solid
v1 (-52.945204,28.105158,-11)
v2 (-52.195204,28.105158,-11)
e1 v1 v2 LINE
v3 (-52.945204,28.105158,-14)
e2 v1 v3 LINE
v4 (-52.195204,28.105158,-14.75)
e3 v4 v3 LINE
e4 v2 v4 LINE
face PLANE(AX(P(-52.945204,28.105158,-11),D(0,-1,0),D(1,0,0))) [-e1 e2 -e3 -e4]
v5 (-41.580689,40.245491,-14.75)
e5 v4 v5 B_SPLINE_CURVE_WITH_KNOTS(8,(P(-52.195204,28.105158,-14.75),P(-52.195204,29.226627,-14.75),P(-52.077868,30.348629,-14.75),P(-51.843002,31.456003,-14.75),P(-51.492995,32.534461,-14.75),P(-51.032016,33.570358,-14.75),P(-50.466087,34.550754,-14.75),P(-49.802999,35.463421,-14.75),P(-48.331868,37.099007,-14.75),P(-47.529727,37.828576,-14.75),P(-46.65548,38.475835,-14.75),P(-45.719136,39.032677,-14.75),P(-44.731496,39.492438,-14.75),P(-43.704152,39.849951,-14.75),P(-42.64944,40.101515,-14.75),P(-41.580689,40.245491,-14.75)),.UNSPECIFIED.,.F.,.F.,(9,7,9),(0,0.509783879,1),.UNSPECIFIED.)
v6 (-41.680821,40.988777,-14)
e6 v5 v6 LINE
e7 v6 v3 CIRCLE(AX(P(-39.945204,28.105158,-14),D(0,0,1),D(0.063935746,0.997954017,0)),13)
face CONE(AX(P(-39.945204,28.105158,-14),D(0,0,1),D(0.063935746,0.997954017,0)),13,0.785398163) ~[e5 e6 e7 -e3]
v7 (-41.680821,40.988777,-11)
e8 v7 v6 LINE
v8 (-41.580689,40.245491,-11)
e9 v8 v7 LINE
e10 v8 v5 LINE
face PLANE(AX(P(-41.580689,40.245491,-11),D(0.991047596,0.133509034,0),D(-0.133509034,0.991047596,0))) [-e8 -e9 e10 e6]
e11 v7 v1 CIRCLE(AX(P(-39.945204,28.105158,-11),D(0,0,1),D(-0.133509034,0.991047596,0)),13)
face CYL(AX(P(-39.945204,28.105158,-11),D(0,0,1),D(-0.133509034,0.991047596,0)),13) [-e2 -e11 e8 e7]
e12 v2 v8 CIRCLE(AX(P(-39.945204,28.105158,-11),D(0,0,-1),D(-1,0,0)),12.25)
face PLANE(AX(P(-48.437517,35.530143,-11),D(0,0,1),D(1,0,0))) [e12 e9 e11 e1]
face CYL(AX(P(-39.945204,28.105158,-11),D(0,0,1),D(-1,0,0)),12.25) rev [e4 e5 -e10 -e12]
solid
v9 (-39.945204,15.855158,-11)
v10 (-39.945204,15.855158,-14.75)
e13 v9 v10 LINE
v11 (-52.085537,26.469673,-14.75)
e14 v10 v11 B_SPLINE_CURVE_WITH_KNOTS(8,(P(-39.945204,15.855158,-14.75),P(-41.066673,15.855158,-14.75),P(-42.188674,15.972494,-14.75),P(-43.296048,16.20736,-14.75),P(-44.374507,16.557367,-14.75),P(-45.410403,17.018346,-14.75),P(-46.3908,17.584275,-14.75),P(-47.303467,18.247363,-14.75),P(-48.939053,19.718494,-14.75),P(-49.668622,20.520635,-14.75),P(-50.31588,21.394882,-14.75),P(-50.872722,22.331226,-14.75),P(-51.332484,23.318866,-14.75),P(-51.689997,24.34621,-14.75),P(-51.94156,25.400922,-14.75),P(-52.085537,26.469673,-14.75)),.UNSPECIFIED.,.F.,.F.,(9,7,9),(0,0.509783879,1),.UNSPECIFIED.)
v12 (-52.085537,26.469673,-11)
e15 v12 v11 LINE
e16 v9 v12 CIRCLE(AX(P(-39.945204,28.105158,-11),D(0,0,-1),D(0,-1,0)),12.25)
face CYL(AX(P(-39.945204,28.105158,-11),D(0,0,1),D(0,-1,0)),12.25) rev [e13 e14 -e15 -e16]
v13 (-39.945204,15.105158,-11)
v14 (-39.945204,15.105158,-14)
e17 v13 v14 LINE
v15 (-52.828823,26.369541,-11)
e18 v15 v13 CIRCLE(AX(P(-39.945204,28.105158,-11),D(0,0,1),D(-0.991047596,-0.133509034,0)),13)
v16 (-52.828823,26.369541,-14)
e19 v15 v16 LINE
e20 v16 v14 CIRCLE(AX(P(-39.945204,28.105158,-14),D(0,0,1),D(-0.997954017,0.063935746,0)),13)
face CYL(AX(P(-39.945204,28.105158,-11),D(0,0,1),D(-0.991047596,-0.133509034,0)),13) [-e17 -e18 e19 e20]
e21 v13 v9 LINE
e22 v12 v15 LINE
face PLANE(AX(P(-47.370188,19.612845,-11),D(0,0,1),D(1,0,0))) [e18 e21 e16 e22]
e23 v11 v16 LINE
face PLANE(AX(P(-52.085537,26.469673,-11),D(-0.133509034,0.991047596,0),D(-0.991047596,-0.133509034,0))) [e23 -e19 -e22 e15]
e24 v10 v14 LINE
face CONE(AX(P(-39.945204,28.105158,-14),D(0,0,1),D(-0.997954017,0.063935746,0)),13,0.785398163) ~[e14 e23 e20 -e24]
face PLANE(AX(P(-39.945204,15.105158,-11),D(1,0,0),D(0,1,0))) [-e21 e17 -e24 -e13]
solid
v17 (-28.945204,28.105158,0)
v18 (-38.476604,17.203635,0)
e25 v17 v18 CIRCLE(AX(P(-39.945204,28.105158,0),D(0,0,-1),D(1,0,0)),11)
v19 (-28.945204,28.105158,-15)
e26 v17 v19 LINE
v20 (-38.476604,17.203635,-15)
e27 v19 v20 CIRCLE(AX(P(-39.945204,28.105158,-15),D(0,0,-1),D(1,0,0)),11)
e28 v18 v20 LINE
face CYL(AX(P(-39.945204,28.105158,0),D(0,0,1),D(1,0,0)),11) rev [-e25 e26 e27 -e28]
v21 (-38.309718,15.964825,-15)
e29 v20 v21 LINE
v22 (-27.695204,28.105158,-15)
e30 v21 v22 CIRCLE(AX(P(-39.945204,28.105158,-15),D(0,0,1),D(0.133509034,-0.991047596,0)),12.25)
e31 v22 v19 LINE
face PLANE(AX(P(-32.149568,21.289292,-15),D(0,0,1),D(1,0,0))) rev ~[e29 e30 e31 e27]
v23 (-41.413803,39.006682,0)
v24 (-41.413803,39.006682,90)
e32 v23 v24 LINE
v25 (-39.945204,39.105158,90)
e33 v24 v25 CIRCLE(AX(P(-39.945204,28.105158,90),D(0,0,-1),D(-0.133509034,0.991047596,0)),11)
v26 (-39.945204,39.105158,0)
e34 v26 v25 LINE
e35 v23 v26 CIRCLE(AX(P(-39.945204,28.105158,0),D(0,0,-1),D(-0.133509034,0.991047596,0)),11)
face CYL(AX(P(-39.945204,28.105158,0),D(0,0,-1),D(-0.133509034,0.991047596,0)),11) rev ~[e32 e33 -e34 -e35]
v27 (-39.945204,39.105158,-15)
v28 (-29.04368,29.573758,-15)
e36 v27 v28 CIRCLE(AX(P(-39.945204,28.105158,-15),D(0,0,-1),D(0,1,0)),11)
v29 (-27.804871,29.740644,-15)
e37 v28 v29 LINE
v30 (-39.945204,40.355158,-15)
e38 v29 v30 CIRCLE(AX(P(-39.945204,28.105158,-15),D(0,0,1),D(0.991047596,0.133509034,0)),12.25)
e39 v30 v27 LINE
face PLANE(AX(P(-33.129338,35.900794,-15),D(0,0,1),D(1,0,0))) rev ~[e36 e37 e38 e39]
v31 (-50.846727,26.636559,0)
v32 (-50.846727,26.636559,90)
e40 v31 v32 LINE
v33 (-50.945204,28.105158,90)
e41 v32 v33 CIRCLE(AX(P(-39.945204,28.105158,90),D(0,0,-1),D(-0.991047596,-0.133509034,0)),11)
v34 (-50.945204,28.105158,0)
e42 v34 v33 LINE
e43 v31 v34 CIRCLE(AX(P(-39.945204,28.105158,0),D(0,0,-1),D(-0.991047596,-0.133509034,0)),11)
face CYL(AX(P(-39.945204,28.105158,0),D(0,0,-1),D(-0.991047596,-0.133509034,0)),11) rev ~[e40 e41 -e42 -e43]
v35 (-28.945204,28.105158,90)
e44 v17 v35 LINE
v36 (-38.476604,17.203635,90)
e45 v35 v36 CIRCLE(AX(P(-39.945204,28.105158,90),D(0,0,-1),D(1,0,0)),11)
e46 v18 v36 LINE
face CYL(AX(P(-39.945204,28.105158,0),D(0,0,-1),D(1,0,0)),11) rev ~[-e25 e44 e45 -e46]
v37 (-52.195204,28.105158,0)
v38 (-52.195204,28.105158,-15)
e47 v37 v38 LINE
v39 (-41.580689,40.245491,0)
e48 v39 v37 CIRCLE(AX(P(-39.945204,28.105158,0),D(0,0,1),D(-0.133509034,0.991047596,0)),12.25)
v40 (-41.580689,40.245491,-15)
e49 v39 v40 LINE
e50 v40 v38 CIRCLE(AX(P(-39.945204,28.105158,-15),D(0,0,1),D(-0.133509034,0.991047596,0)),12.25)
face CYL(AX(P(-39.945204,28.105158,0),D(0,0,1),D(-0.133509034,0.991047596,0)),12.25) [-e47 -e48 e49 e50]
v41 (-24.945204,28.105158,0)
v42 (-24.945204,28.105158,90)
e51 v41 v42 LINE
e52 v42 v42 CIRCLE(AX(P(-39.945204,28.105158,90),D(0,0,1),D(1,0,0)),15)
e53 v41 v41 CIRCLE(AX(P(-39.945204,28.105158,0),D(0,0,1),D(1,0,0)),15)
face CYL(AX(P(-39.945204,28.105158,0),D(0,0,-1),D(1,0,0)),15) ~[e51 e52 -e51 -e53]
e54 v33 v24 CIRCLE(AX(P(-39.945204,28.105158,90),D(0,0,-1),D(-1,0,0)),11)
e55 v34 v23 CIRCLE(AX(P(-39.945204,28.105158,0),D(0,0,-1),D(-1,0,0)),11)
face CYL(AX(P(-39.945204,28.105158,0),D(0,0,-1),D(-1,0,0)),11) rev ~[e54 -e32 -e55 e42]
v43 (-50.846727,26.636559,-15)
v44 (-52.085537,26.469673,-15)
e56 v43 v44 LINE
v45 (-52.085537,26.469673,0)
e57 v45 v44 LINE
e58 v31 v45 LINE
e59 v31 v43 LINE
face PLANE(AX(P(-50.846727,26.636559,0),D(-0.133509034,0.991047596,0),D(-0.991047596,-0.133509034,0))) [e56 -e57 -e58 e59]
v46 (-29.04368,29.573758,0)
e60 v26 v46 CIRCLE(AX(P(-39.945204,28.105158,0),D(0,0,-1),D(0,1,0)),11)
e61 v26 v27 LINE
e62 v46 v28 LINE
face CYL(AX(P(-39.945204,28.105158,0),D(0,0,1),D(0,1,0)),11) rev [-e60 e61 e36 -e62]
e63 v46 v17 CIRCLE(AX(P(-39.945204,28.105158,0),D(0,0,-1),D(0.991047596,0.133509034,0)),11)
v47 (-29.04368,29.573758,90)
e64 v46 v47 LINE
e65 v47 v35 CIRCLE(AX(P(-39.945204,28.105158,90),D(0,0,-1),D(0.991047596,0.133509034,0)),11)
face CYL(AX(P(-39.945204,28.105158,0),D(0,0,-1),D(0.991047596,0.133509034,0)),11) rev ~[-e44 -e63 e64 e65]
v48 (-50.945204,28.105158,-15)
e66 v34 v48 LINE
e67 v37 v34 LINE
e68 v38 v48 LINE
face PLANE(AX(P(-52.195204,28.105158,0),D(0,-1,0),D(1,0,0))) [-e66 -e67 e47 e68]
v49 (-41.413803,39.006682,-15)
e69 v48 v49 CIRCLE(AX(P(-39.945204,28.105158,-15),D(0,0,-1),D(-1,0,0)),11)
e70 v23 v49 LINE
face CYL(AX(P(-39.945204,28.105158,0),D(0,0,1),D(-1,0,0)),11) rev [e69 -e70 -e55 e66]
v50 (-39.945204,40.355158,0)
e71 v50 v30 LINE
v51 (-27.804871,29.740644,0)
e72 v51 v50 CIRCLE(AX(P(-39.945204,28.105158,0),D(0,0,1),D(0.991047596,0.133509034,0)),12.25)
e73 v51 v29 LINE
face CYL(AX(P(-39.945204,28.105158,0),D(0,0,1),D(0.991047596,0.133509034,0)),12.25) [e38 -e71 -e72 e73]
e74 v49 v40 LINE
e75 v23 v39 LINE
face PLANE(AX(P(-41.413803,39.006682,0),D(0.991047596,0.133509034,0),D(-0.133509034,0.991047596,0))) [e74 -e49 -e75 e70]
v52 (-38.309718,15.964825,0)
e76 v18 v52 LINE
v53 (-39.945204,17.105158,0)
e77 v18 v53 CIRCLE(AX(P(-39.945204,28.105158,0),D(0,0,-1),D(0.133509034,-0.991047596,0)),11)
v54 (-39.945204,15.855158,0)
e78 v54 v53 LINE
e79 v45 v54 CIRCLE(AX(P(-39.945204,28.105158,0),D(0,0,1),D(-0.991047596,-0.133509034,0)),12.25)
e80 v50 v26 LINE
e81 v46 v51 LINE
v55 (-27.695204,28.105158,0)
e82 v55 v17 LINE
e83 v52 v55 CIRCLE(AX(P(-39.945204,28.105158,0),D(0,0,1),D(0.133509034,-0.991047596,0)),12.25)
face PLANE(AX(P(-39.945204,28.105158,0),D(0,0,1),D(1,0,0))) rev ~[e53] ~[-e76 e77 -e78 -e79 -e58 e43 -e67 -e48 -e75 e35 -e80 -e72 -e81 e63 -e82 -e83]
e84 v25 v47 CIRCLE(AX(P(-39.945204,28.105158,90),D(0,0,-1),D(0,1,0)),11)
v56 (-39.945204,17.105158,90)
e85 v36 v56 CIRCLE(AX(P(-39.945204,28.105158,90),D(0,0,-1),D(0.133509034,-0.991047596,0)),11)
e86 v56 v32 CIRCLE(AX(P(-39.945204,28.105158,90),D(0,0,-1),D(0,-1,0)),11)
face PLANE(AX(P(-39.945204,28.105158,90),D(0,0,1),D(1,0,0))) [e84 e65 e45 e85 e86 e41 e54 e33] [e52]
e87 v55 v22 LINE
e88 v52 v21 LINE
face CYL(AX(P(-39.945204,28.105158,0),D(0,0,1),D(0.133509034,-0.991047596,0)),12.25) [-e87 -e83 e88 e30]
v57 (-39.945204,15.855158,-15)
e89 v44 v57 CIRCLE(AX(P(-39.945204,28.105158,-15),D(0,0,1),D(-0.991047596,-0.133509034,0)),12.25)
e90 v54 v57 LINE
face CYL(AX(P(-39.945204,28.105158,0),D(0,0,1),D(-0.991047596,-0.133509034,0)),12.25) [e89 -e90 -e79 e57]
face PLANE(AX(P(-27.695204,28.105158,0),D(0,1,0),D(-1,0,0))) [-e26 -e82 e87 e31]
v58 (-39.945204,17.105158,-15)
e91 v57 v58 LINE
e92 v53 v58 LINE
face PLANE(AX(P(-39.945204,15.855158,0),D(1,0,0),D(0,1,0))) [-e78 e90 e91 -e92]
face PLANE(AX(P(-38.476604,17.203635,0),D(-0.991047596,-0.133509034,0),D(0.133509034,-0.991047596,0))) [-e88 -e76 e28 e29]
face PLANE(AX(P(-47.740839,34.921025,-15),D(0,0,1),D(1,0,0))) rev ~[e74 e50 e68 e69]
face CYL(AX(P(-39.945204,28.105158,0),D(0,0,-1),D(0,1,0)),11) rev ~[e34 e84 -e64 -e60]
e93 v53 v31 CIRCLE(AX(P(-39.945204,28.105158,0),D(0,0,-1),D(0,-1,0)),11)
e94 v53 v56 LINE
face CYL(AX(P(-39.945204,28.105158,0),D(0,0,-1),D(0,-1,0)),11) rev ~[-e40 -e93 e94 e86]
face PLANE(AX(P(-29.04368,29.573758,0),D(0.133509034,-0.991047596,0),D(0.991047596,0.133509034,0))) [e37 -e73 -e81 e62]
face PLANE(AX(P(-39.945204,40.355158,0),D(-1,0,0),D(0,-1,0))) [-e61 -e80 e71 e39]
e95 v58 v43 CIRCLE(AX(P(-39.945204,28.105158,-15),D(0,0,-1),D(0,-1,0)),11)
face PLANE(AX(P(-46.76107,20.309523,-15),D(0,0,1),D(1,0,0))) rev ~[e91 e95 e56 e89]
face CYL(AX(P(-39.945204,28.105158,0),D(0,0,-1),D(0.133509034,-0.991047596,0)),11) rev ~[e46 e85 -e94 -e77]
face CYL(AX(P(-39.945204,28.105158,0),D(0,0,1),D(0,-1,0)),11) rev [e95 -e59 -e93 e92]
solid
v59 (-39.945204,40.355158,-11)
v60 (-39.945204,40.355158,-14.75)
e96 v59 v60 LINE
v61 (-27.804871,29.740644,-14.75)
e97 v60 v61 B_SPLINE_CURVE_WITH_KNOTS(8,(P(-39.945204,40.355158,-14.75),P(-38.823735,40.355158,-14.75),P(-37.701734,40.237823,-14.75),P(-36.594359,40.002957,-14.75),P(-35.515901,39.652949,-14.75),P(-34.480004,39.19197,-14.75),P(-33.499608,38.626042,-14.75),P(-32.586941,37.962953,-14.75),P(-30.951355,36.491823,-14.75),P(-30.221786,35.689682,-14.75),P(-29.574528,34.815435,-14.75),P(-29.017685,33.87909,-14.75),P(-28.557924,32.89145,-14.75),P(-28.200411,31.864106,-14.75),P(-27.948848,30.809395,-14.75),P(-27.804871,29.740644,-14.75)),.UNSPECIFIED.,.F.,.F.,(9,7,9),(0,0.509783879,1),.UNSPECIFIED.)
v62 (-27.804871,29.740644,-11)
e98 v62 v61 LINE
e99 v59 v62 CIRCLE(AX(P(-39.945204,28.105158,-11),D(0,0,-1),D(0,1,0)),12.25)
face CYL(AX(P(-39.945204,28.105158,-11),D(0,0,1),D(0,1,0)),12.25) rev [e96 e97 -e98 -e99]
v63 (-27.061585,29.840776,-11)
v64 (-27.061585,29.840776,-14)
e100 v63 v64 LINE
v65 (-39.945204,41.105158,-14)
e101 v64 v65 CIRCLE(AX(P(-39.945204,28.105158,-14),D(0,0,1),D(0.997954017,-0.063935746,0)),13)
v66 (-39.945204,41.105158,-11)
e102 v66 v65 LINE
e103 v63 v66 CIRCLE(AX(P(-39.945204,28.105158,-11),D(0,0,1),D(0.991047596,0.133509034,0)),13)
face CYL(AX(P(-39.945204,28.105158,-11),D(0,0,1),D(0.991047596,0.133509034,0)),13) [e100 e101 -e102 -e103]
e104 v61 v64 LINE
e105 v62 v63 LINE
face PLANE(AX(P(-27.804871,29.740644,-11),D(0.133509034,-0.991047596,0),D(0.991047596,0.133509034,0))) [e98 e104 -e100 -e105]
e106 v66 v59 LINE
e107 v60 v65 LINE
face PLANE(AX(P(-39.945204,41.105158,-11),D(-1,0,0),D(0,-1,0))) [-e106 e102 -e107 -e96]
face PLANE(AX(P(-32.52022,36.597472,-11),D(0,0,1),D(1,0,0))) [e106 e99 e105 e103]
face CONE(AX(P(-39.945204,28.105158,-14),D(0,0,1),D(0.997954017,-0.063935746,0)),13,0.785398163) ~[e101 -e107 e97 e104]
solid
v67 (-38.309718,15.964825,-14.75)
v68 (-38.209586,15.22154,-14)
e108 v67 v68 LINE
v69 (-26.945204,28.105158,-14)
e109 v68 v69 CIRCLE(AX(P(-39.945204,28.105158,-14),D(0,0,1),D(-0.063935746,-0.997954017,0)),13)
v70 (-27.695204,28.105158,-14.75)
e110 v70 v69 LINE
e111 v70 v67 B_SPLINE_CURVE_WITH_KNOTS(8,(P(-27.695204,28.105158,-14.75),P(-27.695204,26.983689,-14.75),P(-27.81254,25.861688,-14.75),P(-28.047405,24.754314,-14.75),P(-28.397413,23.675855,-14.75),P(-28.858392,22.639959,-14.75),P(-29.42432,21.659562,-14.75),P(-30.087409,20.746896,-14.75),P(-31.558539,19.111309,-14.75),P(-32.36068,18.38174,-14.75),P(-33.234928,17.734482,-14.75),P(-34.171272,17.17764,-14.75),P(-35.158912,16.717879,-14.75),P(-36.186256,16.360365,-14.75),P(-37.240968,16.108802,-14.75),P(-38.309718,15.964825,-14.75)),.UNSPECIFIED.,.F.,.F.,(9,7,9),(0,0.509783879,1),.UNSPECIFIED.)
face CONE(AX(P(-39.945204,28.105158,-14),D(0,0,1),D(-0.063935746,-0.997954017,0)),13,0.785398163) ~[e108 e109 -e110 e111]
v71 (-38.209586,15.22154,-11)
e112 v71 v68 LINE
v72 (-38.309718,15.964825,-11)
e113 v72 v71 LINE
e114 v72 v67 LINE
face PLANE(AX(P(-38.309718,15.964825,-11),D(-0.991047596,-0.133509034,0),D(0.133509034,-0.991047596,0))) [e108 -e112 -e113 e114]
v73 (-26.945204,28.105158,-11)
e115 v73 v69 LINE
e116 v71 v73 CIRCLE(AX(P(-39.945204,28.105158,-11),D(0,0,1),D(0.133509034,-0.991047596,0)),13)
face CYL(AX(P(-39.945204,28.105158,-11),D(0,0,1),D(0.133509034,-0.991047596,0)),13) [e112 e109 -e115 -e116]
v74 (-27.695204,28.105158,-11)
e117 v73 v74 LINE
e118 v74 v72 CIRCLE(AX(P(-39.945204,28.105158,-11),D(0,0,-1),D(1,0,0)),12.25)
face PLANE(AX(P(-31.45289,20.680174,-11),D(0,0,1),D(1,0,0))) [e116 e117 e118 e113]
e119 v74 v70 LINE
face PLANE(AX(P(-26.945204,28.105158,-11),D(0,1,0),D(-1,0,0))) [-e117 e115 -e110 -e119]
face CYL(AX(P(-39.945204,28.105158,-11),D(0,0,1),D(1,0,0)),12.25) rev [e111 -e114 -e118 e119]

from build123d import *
from build123d import SkipClean  # not in build123d's __all__

# Parameters (mm, degrees)
F0_R          = 15
F1_DEPTH      = 90
F2_DEPTH      = 15
F3_START      = -11
F3_DEPTH      = 4
F4_T2_ANGLE   = 105.003910896
F4_2_T2_ANGLE = 105.003910896
F4_3_T2_ANGLE = 105.003910896
F4_4_T2_ANGLE = 105.003910896


# Not quite as in the source:
# - a fillet or chamfer that OpenCascade refuses, or shapes differently, is made with other operations: its cross-section is extruded or revolved along the edge and cut away or added


with BuildPart() as f1:
    # F0 (on Top) → F1 (new body)
    with BuildSketch(Plane.XY):
        with Locations((-39.9452038109, 28.1051583588)):
            Circle(F0_R)
        with BuildLine():
            ThreePointArc((-27.061585061, 29.8407758013), (-26.9743317556, 28.9749158684), (-26.9452038109, 28.1051583588))
            ThreePointArc((-26.9452038109, 28.1051583588), (-30.1584007897, 19.5483782036), (-38.2095863684, 15.2215396089))
            ThreePointArc((-38.2095863684, 15.2215396089), (-39.0754463013, 15.1342863035), (-39.9452038109, 15.1051583588))
            ThreePointArc((-39.9452038109, 15.1051583588), (-48.5019839661, 18.3183553376), (-52.8288225609, 26.3695409163))
            ThreePointArc((-52.8288225609, 26.3695409163), (-52.9160758662, 27.2354008492), (-52.9452038109, 28.1051583588))
            ThreePointArc((-52.9452038109, 28.1051583588), (-49.7320068322, 36.661938514), (-41.6808212534, 40.9887771087))
            ThreePointArc((-41.6808212534, 40.9887771087), (-40.8149613205, 41.0760304141), (-39.9452038109, 41.1051583588))
            ThreePointArc((-39.9452038109, 41.1051583588), (-31.3884236558, 37.89196138), (-27.061585061, 29.8407758013))
        make_face(mode=Mode.SUBTRACT)
        with BuildLine():
            ThreePointArc((-52.0855368637, 26.4696726918), (-48.0083235725, 18.8829785888), (-39.9452038109, 15.8551583588))
            Line((-39.9452038109, 15.8551583588), (-39.9452038109, 17.1051583588))
            ThreePointArc((-39.9452038109, 17.1051583588), (-47.1855562499, 19.8240173409), (-50.8467273686, 26.6365589844))
            Line((-50.8467273686, 26.6365589844), (-52.0855368637, 26.4696726918))
        make_face()
        with BuildLine():
            ThreePointArc((-27.8048707581, 29.7406440258), (-27.7226512973, 28.9247375506), (-27.6952038109, 28.1051583588))
            Line((-27.6952038109, 28.1051583588), (-26.9452038109, 28.1051583588))
            ThreePointArc((-26.9452038109, 28.1051583588), (-26.9743317556, 28.9749158684), (-27.061585061, 29.8407758013))
            Line((-27.061585061, 29.8407758013), (-27.8048707581, 29.7406440258))
        make_face()
        with BuildLine():
            ThreePointArc((-39.9452038109, 40.3551583588), (-31.8820840493, 37.3273381288), (-27.8048707581, 29.7406440258))
            Line((-27.8048707581, 29.7406440258), (-27.061585061, 29.8407758013))
            ThreePointArc((-27.061585061, 29.8407758013), (-31.3884236558, 37.89196138), (-39.9452038109, 41.1051583588))
            Line((-39.9452038109, 41.1051583588), (-39.9452038109, 40.3551583588))
        make_face()
        with BuildLine():
            ThreePointArc((-41.5806894779, 40.2454914116), (-40.7647830027, 40.3277108724), (-39.9452038109, 40.3551583588))
            Line((-39.9452038109, 40.3551583588), (-39.9452038109, 41.1051583588))
            ThreePointArc((-39.9452038109, 41.1051583588), (-40.8149613205, 41.0760304141), (-41.6808212534, 40.9887771087))
            Line((-41.6808212534, 40.9887771087), (-41.5806894779, 40.2454914116))
        make_face()
        with BuildLine():
            ThreePointArc((-52.1952038109, 28.1051583588), (-49.1673835809, 36.1682781204), (-41.5806894779, 40.2454914116))
            Line((-41.5806894779, 40.2454914116), (-41.6808212534, 40.9887771087))
            ThreePointArc((-41.6808212534, 40.9887771087), (-49.7320068322, 36.661938514), (-52.9452038109, 28.1051583588))
            Line((-52.9452038109, 28.1051583588), (-52.1952038109, 28.1051583588))
        make_face()
        with BuildLine():
            Line((-52.8288225609, 26.3695409163), (-52.0855368637, 26.4696726918))
            ThreePointArc((-52.0855368637, 26.4696726918), (-52.1677563246, 27.2855791671), (-52.1952038109, 28.1051583588))
            Line((-52.1952038109, 28.1051583588), (-52.9452038109, 28.1051583588))
            ThreePointArc((-52.9452038109, 28.1051583588), (-52.9160758662, 27.2354008492), (-52.8288225609, 26.3695409163))
        make_face()
        with BuildLine():
            Line((-39.9452038109, 15.1051583588), (-39.9452038109, 15.8551583588))
            ThreePointArc((-39.9452038109, 15.8551583588), (-48.0083235725, 18.8829785888), (-52.0855368637, 26.4696726918))
            Line((-52.0855368637, 26.4696726918), (-52.8288225609, 26.3695409163))
            ThreePointArc((-52.8288225609, 26.3695409163), (-48.5019839661, 18.3183553376), (-39.9452038109, 15.1051583588))
        make_face()
        with BuildLine():
            Line((-38.2095863684, 15.2215396089), (-38.309718144, 15.964825306))
            ThreePointArc((-38.309718144, 15.964825306), (-39.1256246192, 15.8826058452), (-39.9452038109, 15.8551583588))
            Line((-39.9452038109, 15.8551583588), (-39.9452038109, 15.1051583588))
            ThreePointArc((-39.9452038109, 15.1051583588), (-39.0754463013, 15.1342863035), (-38.2095863684, 15.2215396089))
        make_face()
        with BuildLine():
            Line((-26.9452038109, 28.1051583588), (-27.6952038109, 28.1051583588))
            ThreePointArc((-27.6952038109, 28.1051583588), (-30.7230240409, 20.0420385972), (-38.309718144, 15.964825306))
            Line((-38.309718144, 15.964825306), (-38.2095863684, 15.2215396089))
            ThreePointArc((-38.2095863684, 15.2215396089), (-30.1584007897, 19.5483782036), (-26.9452038109, 28.1051583588))
        make_face()
        with BuildLine():
            ThreePointArc((-38.309718144, 15.964825306), (-30.7230240409, 20.0420385972), (-27.6952038109, 28.1051583588))
            Line((-27.6952038109, 28.1051583588), (-28.9452038109, 28.1051583588))
            ThreePointArc((-28.9452038109, 28.1051583588), (-31.664062793, 20.8648059198), (-38.4766044365, 17.2036348012))
            Line((-38.4766044365, 17.2036348012), (-38.309718144, 15.964825306))
        make_face()
        with BuildLine():
            Line((-29.0436802533, 29.5737577332), (-27.8048707581, 29.7406440258))
            ThreePointArc((-27.8048707581, 29.7406440258), (-31.8820840493, 37.3273381288), (-39.9452038109, 40.3551583588))
            Line((-39.9452038109, 40.3551583588), (-39.9452038109, 39.1051583588))
            ThreePointArc((-39.9452038109, 39.1051583588), (-32.7048513719, 36.3862993768), (-29.0436802533, 29.5737577332))
        make_face()
        with BuildLine():
            Line((-41.4138031853, 39.0066819164), (-41.5806894779, 40.2454914116))
            ThreePointArc((-41.5806894779, 40.2454914116), (-49.1673835809, 36.1682781204), (-52.1952038109, 28.1051583588))
            Line((-52.1952038109, 28.1051583588), (-50.9452038109, 28.1051583588))
            ThreePointArc((-50.9452038109, 28.1051583588), (-48.2263448289, 35.3455107978), (-41.4138031853, 39.0066819164))
        make_face()
        with BuildLine():
            Line((-39.9452038109, 39.1051583588), (-39.9452038109, 40.3551583588))
            ThreePointArc((-39.9452038109, 40.3551583588), (-40.7647830027, 40.3277108724), (-41.5806894779, 40.2454914116))
            Line((-41.5806894779, 40.2454914116), (-41.4138031853, 39.0066819164))
            ThreePointArc((-41.4138031853, 39.0066819164), (-40.6811524729, 39.0805116364), (-39.9452038109, 39.1051583588))
        make_face()
        with BuildLine():
            Line((-28.9452038109, 28.1051583588), (-27.6952038109, 28.1051583588))
            ThreePointArc((-27.6952038109, 28.1051583588), (-27.7226512973, 28.9247375506), (-27.8048707581, 29.7406440258))
            Line((-27.8048707581, 29.7406440258), (-29.0436802533, 29.5737577332))
            ThreePointArc((-29.0436802533, 29.5737577332), (-28.9698505334, 28.8411070208), (-28.9452038109, 28.1051583588))
        make_face()
        with BuildLine():
            ThreePointArc((-39.9452038109, 15.8551583588), (-39.1256246192, 15.8826058452), (-38.309718144, 15.964825306))
            Line((-38.309718144, 15.964825306), (-38.4766044365, 17.2036348012))
            ThreePointArc((-38.4766044365, 17.2036348012), (-39.209255149, 17.1298050813), (-39.9452038109, 17.1051583588))
            Line((-39.9452038109, 17.1051583588), (-39.9452038109, 15.8551583588))
        make_face()
        with BuildLine():
            ThreePointArc((-52.1952038109, 28.1051583588), (-52.1677563246, 27.2855791671), (-52.0855368637, 26.4696726918))
            Line((-52.0855368637, 26.4696726918), (-50.8467273686, 26.6365589844))
            ThreePointArc((-50.8467273686, 26.6365589844), (-50.9205570885, 27.3692096968), (-50.9452038109, 28.1051583588))
            Line((-50.9452038109, 28.1051583588), (-52.1952038109, 28.1051583588))
        make_face()
    extrude(amount=F1_DEPTH)

    # F0 (on Top) → F2 (join)
    with BuildSketch(Plane.XY):
        with BuildLine():
            Line((-41.4138031853, 39.0066819164), (-41.5806894779, 40.2454914116))
            ThreePointArc((-41.5806894779, 40.2454914116), (-49.1673835809, 36.1682781204), (-52.1952038109, 28.1051583588))
            Line((-52.1952038109, 28.1051583588), (-50.9452038109, 28.1051583588))
            ThreePointArc((-50.9452038109, 28.1051583588), (-48.2263448289, 35.3455107978), (-41.4138031853, 39.0066819164))
        make_face()
        with BuildLine():
            Line((-29.0436802533, 29.5737577332), (-27.8048707581, 29.7406440258))
            ThreePointArc((-27.8048707581, 29.7406440258), (-31.8820840493, 37.3273381288), (-39.9452038109, 40.3551583588))
            Line((-39.9452038109, 40.3551583588), (-39.9452038109, 39.1051583588))
            ThreePointArc((-39.9452038109, 39.1051583588), (-32.7048513719, 36.3862993768), (-29.0436802533, 29.5737577332))
        make_face()
        with BuildLine():
            ThreePointArc((-38.309718144, 15.964825306), (-30.7230240409, 20.0420385972), (-27.6952038109, 28.1051583588))
            Line((-27.6952038109, 28.1051583588), (-28.9452038109, 28.1051583588))
            ThreePointArc((-28.9452038109, 28.1051583588), (-31.664062793, 20.8648059198), (-38.4766044365, 17.2036348012))
            Line((-38.4766044365, 17.2036348012), (-38.309718144, 15.964825306))
        make_face()
        with BuildLine():
            ThreePointArc((-52.0855368637, 26.4696726918), (-48.0083235725, 18.8829785888), (-39.9452038109, 15.8551583588))
            Line((-39.9452038109, 15.8551583588), (-39.9452038109, 17.1051583588))
            ThreePointArc((-39.9452038109, 17.1051583588), (-47.1855562499, 19.8240173409), (-50.8467273686, 26.6365589844))
            Line((-50.8467273686, 26.6365589844), (-52.0855368637, 26.4696726918))
        make_face()
    with SkipClean():  # cleaning this boolean's faces spoils the solid; the shape is the same uncleaned
        extrude(amount=-F2_DEPTH)


with BuildPart() as f3:
    # F0 (on Top) → F3 (new body)
    with BuildSketch(Plane.XY.offset(F3_START)):
        with BuildLine():
            ThreePointArc((-39.9452038109, 40.3551583588), (-31.8820840493, 37.3273381288), (-27.8048707581, 29.7406440258))
            Line((-27.8048707581, 29.7406440258), (-27.061585061, 29.8407758013))
            ThreePointArc((-27.061585061, 29.8407758013), (-31.3884236558, 37.89196138), (-39.9452038109, 41.1051583588))
            Line((-39.9452038109, 41.1051583588), (-39.9452038109, 40.3551583588))
        make_face()
    extrude(amount=-F3_DEPTH)

    # F4#4: chamfer of 1 on 1 edges, made by hand

    # F4_4_s1 → F4_4_t2 (revolve, cut)
    with BuildSketch(Plane(origin=(1.6299605955, 25.4415695588, 0), x_dir=(0, 0, 1), z_dir=(-0.0639357458, -0.9979540172, 0))):
        Polygon((-14, 28.6604008708), (-15, 29.6604008708), (-15, 28.6604008708), align=None)
    revolve(axis=Axis((-39.9452038109, 28.1051583588, -15), (0, 0, 1)), revolution_arc=F4_4_T2_ANGLE, mode=Mode.SUBTRACT)


with BuildPart() as f3b:
    # F0 (on Top) → F3, piece 2 (new body)
    with BuildSketch(Plane.XY.offset(F3_START)):
        with BuildLine():
            Line((-39.9452038109, 15.1051583588), (-39.9452038109, 15.8551583588))
            ThreePointArc((-39.9452038109, 15.8551583588), (-48.0083235725, 18.8829785888), (-52.0855368637, 26.4696726918))
            Line((-52.0855368637, 26.4696726918), (-52.8288225609, 26.3695409163))
            ThreePointArc((-52.8288225609, 26.3695409163), (-48.5019839661, 18.3183553376), (-39.9452038109, 15.1051583588))
        make_face()
    extrude(amount=-F3_DEPTH)

    # F4#3: chamfer of 1 on 1 edges, made by hand

    # F4_3_s1 → F4_3_t2 (revolve, cut)
    with BuildSketch(Plane(origin=(1.6299605955, 25.4415695588, 0), x_dir=(0, 0, 1), z_dir=(0.0639357458, 0.9979540172, 0))):
        Polygon((-14, -54.6604008708), (-15, -53.6604008708), (-15, -54.6604008708), align=None)
    revolve(axis=Axis((-39.9452038109, 28.1051583588, -15), (0, 0, 1)), revolution_arc=F4_3_T2_ANGLE, mode=Mode.SUBTRACT)


with BuildPart() as f3c:
    # F0 (on Top) → F3, piece 3 (new body)
    with BuildSketch(Plane.XY.offset(F3_START)):
        with BuildLine():
            Line((-26.9452038109, 28.1051583588), (-27.6952038109, 28.1051583588))
            ThreePointArc((-27.6952038109, 28.1051583588), (-30.7230240409, 20.0420385972), (-38.309718144, 15.964825306))
            Line((-38.309718144, 15.964825306), (-38.2095863684, 15.2215396089))
            ThreePointArc((-38.2095863684, 15.2215396089), (-30.1584007897, 19.5483782036), (-26.9452038109, 28.1051583588))
        make_face()
    extrude(amount=-F3_DEPTH)

    # F4: chamfer of 1 on 1 edges, made by hand

    # F4_s1 → F4_t2 (revolve, cut)
    with BuildSketch(Plane(origin=(-41.5751644064, 2.6635888001, 0), x_dir=(0, 0, 1), z_dir=(-0.9979540172, 0.0639357458, 0))):
        Polygon((-14, 12.4937292909), (-15, 13.4937292909), (-15, 12.4937292909), align=None)
    revolve(axis=Axis((-39.9452038109, 28.1051583588, -15), (0, 0, 1)), revolution_arc=F4_T2_ANGLE, mode=Mode.SUBTRACT)


with BuildPart() as f3d:
    # F0 (on Top) → F3, piece 4 (new body)
    with BuildSketch(Plane.XY.offset(F3_START)):
        with BuildLine():
            ThreePointArc((-52.1952038109, 28.1051583588), (-49.1673835809, 36.1682781204), (-41.5806894779, 40.2454914116))
            Line((-41.5806894779, 40.2454914116), (-41.6808212534, 40.9887771087))
            ThreePointArc((-41.6808212534, 40.9887771087), (-49.7320068322, 36.661938514), (-52.9452038109, 28.1051583588))
            Line((-52.9452038109, 28.1051583588), (-52.1952038109, 28.1051583588))
        make_face()
    extrude(amount=-F3_DEPTH)

    # F4#2: chamfer of 1 on 1 edges, made by hand

    # F4_2_s1 → F4_2_t2 (revolve, cut)
    with BuildSketch(Plane(origin=(-41.5751644064, 2.6635888001, 0), x_dir=(0, 0, 1), z_dir=(0.9979540172, -0.0639357458, 0))):
        Polygon((-14, -38.4937292909), (-15, -37.4937292909), (-15, -38.4937292909), align=None)
    revolve(axis=Axis((-39.9452038109, 28.1051583588, -15), (0, 0, 1)), revolution_arc=F4_2_T2_ANGLE, mode=Mode.SUBTRACT)


solid = Compound([f1.part, f3.part, f3b.part, f3c.part, f3d.part])
